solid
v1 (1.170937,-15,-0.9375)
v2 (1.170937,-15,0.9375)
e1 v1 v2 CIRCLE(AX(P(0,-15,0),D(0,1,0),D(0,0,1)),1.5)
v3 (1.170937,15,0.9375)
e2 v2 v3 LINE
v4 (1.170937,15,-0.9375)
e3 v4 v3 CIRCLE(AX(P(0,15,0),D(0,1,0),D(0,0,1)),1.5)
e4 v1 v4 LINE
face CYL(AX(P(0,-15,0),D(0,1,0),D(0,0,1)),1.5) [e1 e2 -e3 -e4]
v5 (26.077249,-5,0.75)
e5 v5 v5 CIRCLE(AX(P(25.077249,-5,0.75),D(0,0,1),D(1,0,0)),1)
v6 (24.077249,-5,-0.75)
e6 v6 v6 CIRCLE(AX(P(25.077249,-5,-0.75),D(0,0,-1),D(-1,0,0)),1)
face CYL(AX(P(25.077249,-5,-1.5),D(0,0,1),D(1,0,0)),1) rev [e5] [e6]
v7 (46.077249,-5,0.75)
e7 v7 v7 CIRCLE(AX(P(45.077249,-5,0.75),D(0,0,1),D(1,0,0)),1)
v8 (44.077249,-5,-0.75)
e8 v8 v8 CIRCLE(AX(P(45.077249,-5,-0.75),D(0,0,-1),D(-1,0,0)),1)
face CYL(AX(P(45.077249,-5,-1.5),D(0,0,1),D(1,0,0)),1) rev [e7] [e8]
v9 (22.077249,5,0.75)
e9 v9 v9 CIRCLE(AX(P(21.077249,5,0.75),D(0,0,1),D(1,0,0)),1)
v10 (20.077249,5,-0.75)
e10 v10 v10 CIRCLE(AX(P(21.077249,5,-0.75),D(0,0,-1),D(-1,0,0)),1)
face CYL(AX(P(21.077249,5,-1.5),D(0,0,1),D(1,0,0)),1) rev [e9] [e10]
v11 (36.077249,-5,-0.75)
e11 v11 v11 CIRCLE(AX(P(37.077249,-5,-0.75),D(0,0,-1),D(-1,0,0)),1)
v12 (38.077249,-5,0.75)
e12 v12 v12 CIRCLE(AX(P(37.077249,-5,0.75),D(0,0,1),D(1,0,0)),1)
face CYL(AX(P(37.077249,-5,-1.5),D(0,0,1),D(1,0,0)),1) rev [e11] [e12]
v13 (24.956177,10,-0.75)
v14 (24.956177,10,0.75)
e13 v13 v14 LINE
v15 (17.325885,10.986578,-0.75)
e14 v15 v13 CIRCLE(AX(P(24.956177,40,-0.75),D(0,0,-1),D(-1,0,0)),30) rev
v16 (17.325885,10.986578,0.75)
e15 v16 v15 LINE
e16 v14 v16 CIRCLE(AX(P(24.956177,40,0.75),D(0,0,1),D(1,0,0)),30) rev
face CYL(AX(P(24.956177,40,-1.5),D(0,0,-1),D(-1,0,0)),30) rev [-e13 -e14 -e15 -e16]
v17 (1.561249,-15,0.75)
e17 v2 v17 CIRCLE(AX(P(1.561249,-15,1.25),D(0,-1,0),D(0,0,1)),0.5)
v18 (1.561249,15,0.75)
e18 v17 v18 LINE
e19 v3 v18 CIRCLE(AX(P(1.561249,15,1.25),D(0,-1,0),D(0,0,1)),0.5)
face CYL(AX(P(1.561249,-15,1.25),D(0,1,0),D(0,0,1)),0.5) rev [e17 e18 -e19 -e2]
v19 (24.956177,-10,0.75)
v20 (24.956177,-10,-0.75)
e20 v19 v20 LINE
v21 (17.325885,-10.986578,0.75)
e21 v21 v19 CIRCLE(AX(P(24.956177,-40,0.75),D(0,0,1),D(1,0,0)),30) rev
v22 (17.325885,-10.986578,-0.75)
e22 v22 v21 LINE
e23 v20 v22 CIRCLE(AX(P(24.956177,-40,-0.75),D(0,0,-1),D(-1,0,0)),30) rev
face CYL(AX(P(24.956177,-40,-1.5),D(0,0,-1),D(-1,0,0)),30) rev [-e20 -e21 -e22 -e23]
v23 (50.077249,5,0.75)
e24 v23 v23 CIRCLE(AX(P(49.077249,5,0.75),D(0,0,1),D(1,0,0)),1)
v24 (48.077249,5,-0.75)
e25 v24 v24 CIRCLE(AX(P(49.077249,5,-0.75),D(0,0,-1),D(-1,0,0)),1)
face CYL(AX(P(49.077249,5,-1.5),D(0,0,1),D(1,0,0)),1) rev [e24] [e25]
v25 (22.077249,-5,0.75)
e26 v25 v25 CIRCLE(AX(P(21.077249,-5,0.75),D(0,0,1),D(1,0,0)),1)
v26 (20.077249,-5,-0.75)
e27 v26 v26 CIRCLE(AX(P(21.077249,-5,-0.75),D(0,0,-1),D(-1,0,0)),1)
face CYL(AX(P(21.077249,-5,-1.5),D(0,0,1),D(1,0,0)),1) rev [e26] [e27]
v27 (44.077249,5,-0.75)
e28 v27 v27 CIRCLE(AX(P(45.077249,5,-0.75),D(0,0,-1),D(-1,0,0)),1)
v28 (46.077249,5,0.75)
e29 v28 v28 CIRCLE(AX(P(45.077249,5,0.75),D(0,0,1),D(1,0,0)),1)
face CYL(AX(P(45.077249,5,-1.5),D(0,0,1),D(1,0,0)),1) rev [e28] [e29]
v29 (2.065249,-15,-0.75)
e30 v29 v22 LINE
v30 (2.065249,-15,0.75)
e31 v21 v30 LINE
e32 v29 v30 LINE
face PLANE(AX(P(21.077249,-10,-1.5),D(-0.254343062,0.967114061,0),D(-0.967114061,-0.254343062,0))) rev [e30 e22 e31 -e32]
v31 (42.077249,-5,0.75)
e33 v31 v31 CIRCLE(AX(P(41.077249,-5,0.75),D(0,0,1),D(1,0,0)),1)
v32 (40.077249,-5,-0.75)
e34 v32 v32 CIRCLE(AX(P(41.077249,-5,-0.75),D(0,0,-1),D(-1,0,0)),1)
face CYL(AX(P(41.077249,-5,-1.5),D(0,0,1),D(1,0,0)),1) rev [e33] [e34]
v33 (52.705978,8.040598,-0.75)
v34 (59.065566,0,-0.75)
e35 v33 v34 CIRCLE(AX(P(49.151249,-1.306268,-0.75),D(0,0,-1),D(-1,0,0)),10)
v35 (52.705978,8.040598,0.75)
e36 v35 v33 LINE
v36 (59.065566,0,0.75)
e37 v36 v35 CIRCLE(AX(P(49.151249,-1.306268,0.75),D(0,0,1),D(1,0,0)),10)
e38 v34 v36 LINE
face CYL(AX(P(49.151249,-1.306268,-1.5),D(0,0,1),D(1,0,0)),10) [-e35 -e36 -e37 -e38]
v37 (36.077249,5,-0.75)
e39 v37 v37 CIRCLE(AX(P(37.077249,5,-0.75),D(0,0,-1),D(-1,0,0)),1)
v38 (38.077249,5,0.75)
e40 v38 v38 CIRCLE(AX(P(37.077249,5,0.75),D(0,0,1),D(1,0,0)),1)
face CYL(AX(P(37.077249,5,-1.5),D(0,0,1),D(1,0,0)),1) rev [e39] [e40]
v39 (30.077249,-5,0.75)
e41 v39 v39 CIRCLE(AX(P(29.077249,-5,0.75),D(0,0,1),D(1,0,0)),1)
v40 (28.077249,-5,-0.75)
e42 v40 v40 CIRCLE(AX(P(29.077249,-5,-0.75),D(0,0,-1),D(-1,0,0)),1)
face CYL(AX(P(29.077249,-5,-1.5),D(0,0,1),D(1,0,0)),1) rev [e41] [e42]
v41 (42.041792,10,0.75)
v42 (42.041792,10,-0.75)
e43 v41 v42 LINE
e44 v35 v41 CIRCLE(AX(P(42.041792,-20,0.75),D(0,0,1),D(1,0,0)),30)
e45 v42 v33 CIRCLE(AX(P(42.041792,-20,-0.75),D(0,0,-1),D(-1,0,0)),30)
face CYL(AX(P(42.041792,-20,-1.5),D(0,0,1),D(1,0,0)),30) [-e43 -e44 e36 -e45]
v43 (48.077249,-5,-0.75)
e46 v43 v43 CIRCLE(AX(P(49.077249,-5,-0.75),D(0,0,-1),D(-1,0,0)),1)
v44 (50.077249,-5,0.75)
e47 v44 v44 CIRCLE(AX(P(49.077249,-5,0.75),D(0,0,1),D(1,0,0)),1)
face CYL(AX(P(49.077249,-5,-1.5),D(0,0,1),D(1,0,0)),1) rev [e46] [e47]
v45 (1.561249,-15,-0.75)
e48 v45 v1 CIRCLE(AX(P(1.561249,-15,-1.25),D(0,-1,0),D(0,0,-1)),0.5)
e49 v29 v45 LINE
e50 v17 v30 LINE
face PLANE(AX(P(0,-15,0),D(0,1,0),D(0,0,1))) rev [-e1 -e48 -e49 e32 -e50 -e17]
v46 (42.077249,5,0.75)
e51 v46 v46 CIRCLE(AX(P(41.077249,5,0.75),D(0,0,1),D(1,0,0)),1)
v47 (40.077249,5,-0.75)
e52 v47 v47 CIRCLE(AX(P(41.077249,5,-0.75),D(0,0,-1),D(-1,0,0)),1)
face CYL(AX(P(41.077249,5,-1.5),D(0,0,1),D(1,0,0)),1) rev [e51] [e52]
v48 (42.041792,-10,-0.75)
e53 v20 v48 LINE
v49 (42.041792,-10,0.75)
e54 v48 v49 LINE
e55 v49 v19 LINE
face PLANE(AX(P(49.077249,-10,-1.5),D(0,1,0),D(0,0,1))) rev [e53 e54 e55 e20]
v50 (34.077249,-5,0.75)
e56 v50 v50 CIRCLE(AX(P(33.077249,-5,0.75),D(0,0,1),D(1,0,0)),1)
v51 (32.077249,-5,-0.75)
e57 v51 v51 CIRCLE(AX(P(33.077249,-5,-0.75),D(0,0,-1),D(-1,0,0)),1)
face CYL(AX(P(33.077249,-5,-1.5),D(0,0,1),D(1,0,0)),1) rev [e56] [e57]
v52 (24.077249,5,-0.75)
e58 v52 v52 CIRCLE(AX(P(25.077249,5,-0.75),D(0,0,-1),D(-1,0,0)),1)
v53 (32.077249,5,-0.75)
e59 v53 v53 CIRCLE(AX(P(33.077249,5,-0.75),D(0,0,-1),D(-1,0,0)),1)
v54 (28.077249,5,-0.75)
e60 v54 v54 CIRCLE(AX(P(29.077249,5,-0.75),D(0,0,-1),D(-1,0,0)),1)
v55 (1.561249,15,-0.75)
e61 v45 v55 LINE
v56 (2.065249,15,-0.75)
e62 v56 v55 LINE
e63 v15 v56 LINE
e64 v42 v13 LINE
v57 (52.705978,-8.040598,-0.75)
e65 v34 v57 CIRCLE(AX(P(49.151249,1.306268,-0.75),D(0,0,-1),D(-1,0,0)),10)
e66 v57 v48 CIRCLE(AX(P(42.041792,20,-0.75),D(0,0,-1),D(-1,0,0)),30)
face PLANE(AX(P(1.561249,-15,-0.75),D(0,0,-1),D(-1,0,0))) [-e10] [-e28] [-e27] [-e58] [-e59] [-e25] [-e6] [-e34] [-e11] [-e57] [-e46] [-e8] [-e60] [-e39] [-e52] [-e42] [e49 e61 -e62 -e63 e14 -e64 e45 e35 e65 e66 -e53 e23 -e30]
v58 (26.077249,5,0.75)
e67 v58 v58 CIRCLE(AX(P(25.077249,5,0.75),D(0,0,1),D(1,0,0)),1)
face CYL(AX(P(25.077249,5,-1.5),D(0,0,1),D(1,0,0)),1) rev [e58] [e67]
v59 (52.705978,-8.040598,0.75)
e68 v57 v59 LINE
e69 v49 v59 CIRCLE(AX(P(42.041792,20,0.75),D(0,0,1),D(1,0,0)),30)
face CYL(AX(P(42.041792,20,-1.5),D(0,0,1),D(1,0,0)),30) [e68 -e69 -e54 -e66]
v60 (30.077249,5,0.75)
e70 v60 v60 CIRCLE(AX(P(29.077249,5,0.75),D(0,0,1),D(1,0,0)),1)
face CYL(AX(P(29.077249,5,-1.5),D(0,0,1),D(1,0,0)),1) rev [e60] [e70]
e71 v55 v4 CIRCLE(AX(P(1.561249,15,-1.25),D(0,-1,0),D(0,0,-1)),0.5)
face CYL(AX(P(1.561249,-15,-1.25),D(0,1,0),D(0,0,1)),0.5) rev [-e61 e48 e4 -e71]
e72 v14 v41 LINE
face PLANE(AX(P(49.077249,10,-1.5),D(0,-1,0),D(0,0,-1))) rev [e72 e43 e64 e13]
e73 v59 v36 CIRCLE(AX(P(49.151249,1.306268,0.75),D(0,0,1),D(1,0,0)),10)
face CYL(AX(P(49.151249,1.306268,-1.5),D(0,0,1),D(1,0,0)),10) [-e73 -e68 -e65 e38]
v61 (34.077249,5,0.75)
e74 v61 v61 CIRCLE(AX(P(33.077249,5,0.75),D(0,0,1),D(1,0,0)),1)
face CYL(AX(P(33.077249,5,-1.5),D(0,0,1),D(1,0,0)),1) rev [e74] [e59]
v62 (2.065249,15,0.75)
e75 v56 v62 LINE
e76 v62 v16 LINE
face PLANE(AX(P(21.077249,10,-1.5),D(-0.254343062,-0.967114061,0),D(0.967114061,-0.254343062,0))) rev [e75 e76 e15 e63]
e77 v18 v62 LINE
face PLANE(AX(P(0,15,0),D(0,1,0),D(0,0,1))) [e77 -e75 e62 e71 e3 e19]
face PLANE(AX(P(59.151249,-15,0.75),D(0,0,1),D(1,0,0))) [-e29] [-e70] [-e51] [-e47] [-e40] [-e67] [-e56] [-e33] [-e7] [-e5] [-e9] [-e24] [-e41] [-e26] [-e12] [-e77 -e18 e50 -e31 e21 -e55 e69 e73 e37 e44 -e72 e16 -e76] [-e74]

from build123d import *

# Parameters (mm, degrees)
BOSS_EXTRUDE1_DEPTH      = 15
BOSS_EXTRUDE1_DEPTH_BACK = 15
SKETCH2_R                = 1
CUT_EXTRUDE1_DEPTH       = 62.064988474
FILLET1_R                = 30
FILLET2_R                = 10


with BuildPart() as part:
    # Sketch1 → Boss-Extrude1 (new, two sides: drawn at the far end of the back side and taken through both)
    with BuildSketch(Plane(origin=(0, 0, 0), x_dir=(1, 0, 0), z_dir=(0, 1, 0)).offset(-BOSS_EXTRUDE1_DEPTH_BACK)):
        with BuildLine():
            Line((1.5612495, 0.75), (59.1512495, 0.75))
            Line((59.1512495, 0.75), (59.1512495, -0.75))
            Line((59.1512495, -0.75), (1.5612495, -0.75))
            ThreePointArc((1.5612495, -0.75), (1.344743149, -0.799306091), (1.170937125, -0.9375))
            ThreePointArc((1.170937125, -0.9375), (-1.5, 0), (1.170937125, 0.9375))
            ThreePointArc((1.170937125, 0.9375), (1.344743149, 0.799306091), (1.5612495, 0.75))
        make_face()
    extrude(amount=BOSS_EXTRUDE1_DEPTH + BOSS_EXTRUDE1_DEPTH_BACK)

    # Sketch2 → Cut-Extrude1 (cut, through all)
    with BuildSketch(Plane.XY.offset(0.75)):
        with Locations((49.0772495, 5)):
            Circle(SKETCH2_R)
        with Locations((45.0772495, 5)):
            Circle(SKETCH2_R)
        with Locations((41.0772495, 5)):
            Circle(SKETCH2_R)
        with Locations((37.0772495, 5)):
            Circle(SKETCH2_R)
        with Locations((33.0772495, 5)):
            Circle(SKETCH2_R)
        with Locations((29.0772495, 5)):
            Circle(SKETCH2_R)
        with Locations((25.0772495, 5)):
            Circle(SKETCH2_R)
        with Locations((21.0772495, 5)):
            Circle(SKETCH2_R)
        with Locations((45.0772495, -5)):
            Circle(SKETCH2_R)
        with Locations((41.0772495, -5)):
            Circle(SKETCH2_R)
        with Locations((37.0772495, -5)):
            Circle(SKETCH2_R)
        with Locations((33.0772495, -5)):
            Circle(SKETCH2_R)
        with Locations((29.0772495, -5)):
            Circle(SKETCH2_R)
        with Locations((25.0772495, -5)):
            Circle(SKETCH2_R)
        with Locations((21.0772495, -5)):
            Circle(SKETCH2_R)
        with Locations((49.0772495, -5)):
            Circle(SKETCH2_R)
        Polygon((49.0772495, 10), (21.0772495, 10), (2.0652495, 15), (59.1512495, 15), (59.1512495, 5), align=None)
        Polygon((49.0772495, -10), (21.0772495, -10), (2.0652495, -15), (59.1512495, -15), (59.1512495, -5), align=None)
    extrude(amount=-CUT_EXTRUDE1_DEPTH, mode=Mode.SUBTRACT)

    # Fillet1
    fillet1_edges = [part.edges().sort_by_distance(p)[0] for p in [
        (49.0772495, 10, 0),
        (21.0772495, 10, 0),
        (49.0772495, -10, 0),
        (21.0772495, -10, 0),
    ]]
    fillet(fillet1_edges, radius=FILLET1_R)

    # Fillet2
    # the kernel refuses this fillet: 10 mm, written as the material it takes off along each edge
    with BuildSketch(Plane(origin=(59.1512495, -5, 18.566207641), x_dir=(-0.9044112472912746, -0.42666180491466615, 0), z_dir=(0, 0, -1))) as fillet2_piece_1:
        with BuildLine():
            CenterArc((6.353468821, 9.970077682), FILLET2_R, 205.255895662, 69.177572528)
            Line((-2.690643652, 5.703459633), (-3.595054899, 5.276797828))
            Line((-3.595054899, 5.276797828), (-0.904411247, -0.426661805))
            Line((-0.904411247, -0.426661805), (-0.019905188, -0.999801872))
            ThreePointArc((-0.019905188, -0.999801872), (4.190379521, -1.083624989), (7.20378448, -0.997007768))
            Line((7.20378448, -0.997007768), (7.126483056, 0))
        make_face()
    extrude(amount=37.132415281, mode=Mode.SUBTRACT)
    with BuildSketch(Plane(origin=(59.1512495, 5, 18.566207641), x_dir=(0, -1, 0), z_dir=(0, 0, -1))) as fillet2_piece_2:
        with BuildLine():
            CenterArc((6.306267918, 10), FILLET2_R, 200.822427472, 69.177572528)
            Line((-3.040598123, 6.44527143), (-3.975284728, 6.089798573))
            ThreePointArc((-3.975284728, 6.089798573), (-2.767917517, 3.327484976), (-0.895739275, -0.444579747))
            Line((-0.895739275, -0.444579747), (0, -1))
            Line((0, -1), (6.306267918, -1))
            Line((6.306267918, -1), (6.306267918, 0))
        make_face()
    extrude(amount=37.132415281, mode=Mode.SUBTRACT)


solid = part.part
